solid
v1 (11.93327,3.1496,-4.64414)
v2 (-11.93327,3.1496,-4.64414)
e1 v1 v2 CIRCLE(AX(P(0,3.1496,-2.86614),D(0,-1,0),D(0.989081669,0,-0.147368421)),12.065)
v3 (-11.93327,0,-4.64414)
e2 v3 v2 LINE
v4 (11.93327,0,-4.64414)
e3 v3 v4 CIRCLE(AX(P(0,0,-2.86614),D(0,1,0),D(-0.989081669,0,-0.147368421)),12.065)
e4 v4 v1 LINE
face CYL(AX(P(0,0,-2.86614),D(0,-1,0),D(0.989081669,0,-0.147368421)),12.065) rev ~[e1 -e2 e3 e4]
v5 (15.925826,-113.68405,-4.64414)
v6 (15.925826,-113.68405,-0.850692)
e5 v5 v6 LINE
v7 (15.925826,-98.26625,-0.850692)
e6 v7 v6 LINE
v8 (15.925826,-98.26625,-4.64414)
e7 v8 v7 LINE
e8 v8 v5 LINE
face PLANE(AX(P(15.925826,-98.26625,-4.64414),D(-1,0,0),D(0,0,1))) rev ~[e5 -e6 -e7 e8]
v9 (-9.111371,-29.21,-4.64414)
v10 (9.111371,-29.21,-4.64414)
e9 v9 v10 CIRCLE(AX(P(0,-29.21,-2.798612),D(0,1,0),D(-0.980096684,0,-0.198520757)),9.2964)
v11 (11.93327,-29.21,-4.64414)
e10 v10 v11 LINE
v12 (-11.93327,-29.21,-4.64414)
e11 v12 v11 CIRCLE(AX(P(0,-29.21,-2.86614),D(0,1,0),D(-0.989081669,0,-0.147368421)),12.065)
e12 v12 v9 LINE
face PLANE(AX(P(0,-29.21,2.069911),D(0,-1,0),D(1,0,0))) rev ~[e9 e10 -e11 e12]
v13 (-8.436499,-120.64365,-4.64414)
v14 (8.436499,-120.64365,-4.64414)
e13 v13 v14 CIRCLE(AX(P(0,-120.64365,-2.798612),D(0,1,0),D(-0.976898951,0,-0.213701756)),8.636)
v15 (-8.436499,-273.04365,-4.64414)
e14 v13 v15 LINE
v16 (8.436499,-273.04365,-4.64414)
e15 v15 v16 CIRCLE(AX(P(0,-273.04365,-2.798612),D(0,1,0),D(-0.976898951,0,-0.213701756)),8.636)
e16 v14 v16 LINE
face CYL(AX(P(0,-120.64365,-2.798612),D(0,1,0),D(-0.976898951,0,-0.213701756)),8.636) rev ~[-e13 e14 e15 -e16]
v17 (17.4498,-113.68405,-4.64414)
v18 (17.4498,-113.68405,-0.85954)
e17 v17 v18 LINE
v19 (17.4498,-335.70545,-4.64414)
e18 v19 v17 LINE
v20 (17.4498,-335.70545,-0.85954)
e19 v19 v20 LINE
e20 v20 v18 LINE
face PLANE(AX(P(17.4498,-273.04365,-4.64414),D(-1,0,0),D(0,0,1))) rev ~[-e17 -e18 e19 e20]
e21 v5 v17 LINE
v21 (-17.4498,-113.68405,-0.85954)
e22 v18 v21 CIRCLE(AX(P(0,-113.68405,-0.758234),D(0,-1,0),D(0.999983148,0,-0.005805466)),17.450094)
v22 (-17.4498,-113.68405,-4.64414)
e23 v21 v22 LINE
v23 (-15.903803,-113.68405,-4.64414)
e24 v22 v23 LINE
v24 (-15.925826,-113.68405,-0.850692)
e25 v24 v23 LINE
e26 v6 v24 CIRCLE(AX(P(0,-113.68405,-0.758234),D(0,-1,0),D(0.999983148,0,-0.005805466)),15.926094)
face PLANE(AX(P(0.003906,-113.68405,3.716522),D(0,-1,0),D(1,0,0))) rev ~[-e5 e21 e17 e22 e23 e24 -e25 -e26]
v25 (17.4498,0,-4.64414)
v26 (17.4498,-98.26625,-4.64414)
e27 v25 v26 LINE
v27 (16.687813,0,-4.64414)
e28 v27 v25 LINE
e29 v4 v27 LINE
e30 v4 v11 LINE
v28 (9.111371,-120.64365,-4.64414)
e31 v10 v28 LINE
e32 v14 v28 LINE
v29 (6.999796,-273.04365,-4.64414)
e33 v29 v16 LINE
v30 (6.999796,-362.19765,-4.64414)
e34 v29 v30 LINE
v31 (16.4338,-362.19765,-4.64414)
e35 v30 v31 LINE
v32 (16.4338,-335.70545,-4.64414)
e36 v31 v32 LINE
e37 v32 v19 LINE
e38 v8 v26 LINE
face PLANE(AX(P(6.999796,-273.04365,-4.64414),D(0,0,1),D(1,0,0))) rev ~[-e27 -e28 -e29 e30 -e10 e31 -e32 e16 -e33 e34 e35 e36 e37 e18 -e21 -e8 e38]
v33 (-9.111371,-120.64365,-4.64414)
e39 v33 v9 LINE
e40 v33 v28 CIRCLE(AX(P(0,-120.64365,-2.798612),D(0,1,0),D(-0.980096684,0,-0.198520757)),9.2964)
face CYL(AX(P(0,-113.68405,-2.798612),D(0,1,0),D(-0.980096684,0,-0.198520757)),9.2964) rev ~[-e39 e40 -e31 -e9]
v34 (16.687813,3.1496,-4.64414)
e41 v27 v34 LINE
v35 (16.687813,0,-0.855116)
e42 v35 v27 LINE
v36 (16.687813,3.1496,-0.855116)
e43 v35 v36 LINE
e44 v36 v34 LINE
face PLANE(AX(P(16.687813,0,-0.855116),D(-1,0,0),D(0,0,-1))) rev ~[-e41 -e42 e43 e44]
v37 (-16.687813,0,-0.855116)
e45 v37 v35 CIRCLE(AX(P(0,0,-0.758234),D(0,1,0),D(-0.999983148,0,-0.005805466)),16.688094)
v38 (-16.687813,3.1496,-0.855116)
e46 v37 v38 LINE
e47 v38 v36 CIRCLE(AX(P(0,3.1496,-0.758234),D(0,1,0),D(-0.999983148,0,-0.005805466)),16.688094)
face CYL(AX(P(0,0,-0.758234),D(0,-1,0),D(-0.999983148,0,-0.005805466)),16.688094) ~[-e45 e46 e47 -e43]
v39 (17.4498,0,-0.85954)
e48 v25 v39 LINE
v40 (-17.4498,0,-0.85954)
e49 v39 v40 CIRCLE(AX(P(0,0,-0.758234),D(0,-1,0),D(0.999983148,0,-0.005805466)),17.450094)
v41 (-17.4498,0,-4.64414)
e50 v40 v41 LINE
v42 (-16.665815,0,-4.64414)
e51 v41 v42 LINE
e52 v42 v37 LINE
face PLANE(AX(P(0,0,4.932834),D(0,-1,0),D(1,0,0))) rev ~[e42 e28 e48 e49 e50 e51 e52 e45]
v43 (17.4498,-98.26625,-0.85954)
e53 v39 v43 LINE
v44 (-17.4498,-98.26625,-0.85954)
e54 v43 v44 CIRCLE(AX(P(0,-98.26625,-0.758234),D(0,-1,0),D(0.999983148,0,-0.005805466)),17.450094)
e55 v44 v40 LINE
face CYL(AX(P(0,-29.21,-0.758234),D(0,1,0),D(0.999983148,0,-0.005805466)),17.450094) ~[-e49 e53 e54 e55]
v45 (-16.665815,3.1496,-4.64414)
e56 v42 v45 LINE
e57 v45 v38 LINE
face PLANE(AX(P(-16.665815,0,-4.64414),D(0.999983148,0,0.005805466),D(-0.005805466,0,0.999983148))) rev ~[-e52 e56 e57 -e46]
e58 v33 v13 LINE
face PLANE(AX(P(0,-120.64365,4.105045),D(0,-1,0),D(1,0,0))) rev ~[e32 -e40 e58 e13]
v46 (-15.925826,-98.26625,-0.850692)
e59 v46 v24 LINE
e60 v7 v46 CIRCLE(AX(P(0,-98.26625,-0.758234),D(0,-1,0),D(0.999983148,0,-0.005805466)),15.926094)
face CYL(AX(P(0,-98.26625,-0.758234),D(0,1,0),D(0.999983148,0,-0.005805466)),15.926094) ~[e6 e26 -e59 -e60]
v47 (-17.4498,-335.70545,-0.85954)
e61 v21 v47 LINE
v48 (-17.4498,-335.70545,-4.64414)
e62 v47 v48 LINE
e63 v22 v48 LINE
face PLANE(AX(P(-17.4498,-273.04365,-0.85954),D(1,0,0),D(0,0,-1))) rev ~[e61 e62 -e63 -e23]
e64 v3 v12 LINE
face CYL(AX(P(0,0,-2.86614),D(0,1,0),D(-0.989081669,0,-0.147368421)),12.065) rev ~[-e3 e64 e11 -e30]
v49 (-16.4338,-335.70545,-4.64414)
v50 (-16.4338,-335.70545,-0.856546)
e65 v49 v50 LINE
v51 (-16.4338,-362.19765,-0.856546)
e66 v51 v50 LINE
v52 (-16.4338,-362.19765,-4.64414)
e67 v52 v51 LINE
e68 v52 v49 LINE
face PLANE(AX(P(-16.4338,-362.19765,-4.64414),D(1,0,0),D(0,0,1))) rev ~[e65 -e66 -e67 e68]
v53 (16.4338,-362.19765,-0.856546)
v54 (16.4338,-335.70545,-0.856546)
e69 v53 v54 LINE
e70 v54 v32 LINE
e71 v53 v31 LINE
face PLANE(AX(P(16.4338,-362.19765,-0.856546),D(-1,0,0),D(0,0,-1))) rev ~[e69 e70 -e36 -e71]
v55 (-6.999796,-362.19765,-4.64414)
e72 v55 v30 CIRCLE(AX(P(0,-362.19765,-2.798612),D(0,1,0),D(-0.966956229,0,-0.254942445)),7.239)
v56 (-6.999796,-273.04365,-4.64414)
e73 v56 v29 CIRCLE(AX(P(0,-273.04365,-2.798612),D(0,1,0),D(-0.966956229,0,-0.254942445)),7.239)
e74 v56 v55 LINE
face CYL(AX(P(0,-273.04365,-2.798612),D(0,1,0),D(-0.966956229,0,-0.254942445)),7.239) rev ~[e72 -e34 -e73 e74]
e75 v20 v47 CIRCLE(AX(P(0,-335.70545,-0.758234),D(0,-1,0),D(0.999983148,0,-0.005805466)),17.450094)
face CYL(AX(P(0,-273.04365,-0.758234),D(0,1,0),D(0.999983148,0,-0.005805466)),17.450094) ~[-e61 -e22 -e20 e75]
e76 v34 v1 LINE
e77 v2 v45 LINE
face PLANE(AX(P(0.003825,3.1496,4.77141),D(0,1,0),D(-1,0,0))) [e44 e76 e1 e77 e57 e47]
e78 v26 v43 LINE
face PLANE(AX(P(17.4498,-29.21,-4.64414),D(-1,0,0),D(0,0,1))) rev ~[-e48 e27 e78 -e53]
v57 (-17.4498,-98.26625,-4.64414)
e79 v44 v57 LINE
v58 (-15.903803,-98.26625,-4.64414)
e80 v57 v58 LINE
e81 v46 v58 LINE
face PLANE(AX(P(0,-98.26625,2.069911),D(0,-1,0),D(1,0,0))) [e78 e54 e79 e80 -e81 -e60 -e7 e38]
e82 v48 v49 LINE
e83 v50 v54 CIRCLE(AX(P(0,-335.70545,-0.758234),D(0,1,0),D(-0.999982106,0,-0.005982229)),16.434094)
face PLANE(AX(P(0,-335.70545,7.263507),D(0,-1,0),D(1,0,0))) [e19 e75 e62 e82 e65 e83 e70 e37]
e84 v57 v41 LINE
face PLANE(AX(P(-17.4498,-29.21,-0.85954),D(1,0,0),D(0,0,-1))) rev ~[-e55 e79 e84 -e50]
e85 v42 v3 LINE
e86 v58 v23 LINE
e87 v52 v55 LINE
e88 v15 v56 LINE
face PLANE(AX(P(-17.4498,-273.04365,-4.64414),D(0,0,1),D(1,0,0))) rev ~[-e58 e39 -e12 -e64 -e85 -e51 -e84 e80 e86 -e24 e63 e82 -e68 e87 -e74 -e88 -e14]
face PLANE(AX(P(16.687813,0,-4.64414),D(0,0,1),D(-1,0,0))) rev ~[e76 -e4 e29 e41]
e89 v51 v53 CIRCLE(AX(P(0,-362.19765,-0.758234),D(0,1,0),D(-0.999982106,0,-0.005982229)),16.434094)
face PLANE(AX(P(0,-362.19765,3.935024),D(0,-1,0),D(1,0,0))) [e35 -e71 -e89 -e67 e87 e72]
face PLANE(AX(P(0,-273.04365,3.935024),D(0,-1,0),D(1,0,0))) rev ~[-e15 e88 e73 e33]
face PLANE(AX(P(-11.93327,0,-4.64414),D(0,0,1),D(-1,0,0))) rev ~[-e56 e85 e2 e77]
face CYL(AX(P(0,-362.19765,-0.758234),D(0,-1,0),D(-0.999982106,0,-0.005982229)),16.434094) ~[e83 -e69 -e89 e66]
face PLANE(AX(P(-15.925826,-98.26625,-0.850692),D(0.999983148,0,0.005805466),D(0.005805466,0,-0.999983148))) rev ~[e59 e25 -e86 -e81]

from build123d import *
from build123d import SkipClean  # not in build123d's __all__

# Parameters (mm, degrees)
F1_DEPTH  = 29.21
F3_DEPTH  = 69.05625
F5_DEPTH  = 15.4178
F7_DEPTH  = 6.9596
F9_DEPTH  = 152.4
F11_DEPTH = 89.154
F13_DEPTH = 26.4922
F15_DEPTH = 3.1496


with BuildPart() as f1:
    # F0 (on Front) → F1 (new body)
    with BuildSketch(Plane.XZ):
        with BuildLine():
            Line((11.9332703397, -4.6441399077), (17.4498, -4.6441399077))
            Line((17.4498, -4.6441399077), (17.4498, -0.8595399077))
            ThreePointArc((17.4498, -0.8595399077), (0, 16.6918600923), (-17.4498, -0.8595399077))
            Line((-17.4498, -0.8595399077), (-17.4498, -4.6441399077))
            Line((-17.4498, -4.6441399077), (-11.9332703397, -4.6441399077))
            ThreePointArc((-11.9332703397, -4.6441399077), (0, 9.1988600923), (11.9332703397, -4.6441399077))
        make_face()
    extrude(amount=F1_DEPTH)

    # F2 (on face) → F3 (join)
    with BuildSketch(Plane.XZ.offset(29.21)):
        with BuildLine():
            ThreePointArc((-9.1113708093, -4.6441399077), (0, 6.4977884545), (9.1113708093, -4.6441399077))
            Line((9.1113708093, -4.6441399077), (11.9332703397, -4.6441399077))
            ThreePointArc((11.9332703397, -4.6441399077), (0, 9.1988600923), (-11.9332703397, -4.6441399077))
            Line((-11.9332703397, -4.6441399077), (-9.1113708093, -4.6441399077))
        make_face()
        with BuildLine():
            ThreePointArc((-11.9332703397, -4.6441399077), (0, 9.1988600923), (11.9332703397, -4.6441399077))
            Line((11.9332703397, -4.6441399077), (17.4498, -4.6441399077))
            Line((17.4498, -4.6441399077), (17.4498, -0.8595399077))
            ThreePointArc((17.4498, -0.8595399077), (0, 16.6918600923), (-17.4498, -0.8595399077))
            Line((-17.4498, -0.8595399077), (-17.4498, -4.6441399077))
            Line((-17.4498, -4.6441399077), (-11.9332703397, -4.6441399077))
        make_face()
    extrude(amount=F3_DEPTH)

    # F4 (on face) → F5 (join)
    with BuildSketch(Plane.XZ.offset(98.26625)):
        with BuildLine():
            Line((15.9258256822, -4.6441399077), (15.9258256822, -0.850692377))
            ThreePointArc((15.9258256822, -0.850692377), (0, 15.1678600923), (-15.9258256822, -0.850692377))
            Line((-15.9258256822, -0.850692377), (-15.9038025792, -4.6441399077))
            Line((-15.9038025792, -4.6441399077), (-9.1113708093, -4.6441399077))
            ThreePointArc((-9.1113708093, -4.6441399077), (0, 6.4977884545), (9.1113708093, -4.6441399077))
            Line((9.1113708093, -4.6441399077), (15.9258256822, -4.6441399077))
        make_face()
    extrude(amount=F5_DEPTH)

    # F6 (on face) → F7 (join)
    with BuildSketch(Plane.XZ.offset(113.68405)):
        with BuildLine():
            ThreePointArc((-9.1113708093, -4.6441399077), (0, 6.4977884545), (9.1113708093, -4.6441399077))
            Line((9.1113708093, -4.6441399077), (15.9258256822, -4.6441399077))
            Line((15.9258256822, -4.6441399077), (15.9258256822, -0.850692377))
            ThreePointArc((15.9258256822, -0.850692377), (0, 15.1678600923), (-15.9258256822, -0.850692377))
            Line((-15.9258256822, -0.850692377), (-15.9038025792, -4.6441399077))
            Line((-15.9038025792, -4.6441399077), (-9.1113708093, -4.6441399077))
        make_face()
        with BuildLine():
            Line((15.9258256822, -0.850692377), (15.9258256822, -4.6441399077))
            Line((15.9258256822, -4.6441399077), (17.4498, -4.6441399077))
            Line((17.4498, -4.6441399077), (17.4498, -0.8595399077))
            ThreePointArc((17.4498, -0.8595399077), (0, 16.6918600923), (-17.4498, -0.8595399077))
            Line((-17.4498, -0.8595399077), (-17.4498, -4.6441399077))
            Line((-17.4498, -4.6441399077), (-15.9038025792, -4.6441399077))
            Line((-15.9038025792, -4.6441399077), (-15.9258256822, -0.850692377))
            ThreePointArc((-15.9258256822, -0.850692377), (0, 15.1678600923), (15.9258256822, -0.850692377))
        make_face()
    extrude(amount=F7_DEPTH)

    # F8 (on face) → F9 (join)
    with BuildSketch(Plane.XZ.offset(120.64365)):
        with BuildLine():
            ThreePointArc((17.4498, -0.8595399077), (0, 16.6918600923), (-17.4498, -0.8595399077))
            Line((-17.4498, -0.8595399077), (-17.4498, -4.6441399077))
            Line((-17.4498, -4.6441399077), (-9.1113708093, -4.6441399077))
            ThreePointArc((-9.1113708093, -4.6441399077), (0, 6.4977884545), (9.1113708093, -4.6441399077))
            Line((9.1113708093, -4.6441399077), (17.4498, -4.6441399077))
            Line((17.4498, -4.6441399077), (17.4498, -0.8595399077))
        make_face()
        with BuildLine():
            ThreePointArc((9.1113708093, -4.6441399077), (0, 6.4977884545), (-9.1113708093, -4.6441399077))
            Line((-9.1113708093, -4.6441399077), (-8.4364993371, -4.6441399077))
            ThreePointArc((-8.4364993371, -4.6441399077), (0, 5.8373884545), (8.4364993371, -4.6441399077))
            Line((8.4364993371, -4.6441399077), (9.1113708093, -4.6441399077))
        make_face()
    extrude(amount=F9_DEPTH)

    # F10 (on face) → F11 (join)
    with BuildSketch(Plane.XZ.offset(273.04365)):
        with BuildLine():
            ThreePointArc((17.4498, -0.8595399077), (0, 16.6918600923), (-17.4498, -0.8595399077))
            Line((-17.4498, -0.8595399077), (-17.4498, -4.6441399077))
            Line((-17.4498, -4.6441399077), (-8.4364993371, -4.6441399077))
            ThreePointArc((-8.4364993371, -4.6441399077), (0, 5.8373884545), (8.4364993371, -4.6441399077))
            Line((8.4364993371, -4.6441399077), (17.4498, -4.6441399077))
            Line((17.4498, -4.6441399077), (17.4498, -0.8595399077))
        make_face()
        with BuildLine():
            ThreePointArc((8.4364993371, -4.6441399077), (0, 5.8373884545), (-8.4364993371, -4.6441399077))
            Line((-8.4364993371, -4.6441399077), (-6.9997961445, -4.6441399077))
            ThreePointArc((-6.9997961445, -4.6441399077), (0, 4.4403884545), (6.9997961445, -4.6441399077))
            Line((6.9997961445, -4.6441399077), (8.4364993371, -4.6441399077))
        make_face()
    extrude(amount=F11_DEPTH)

    # F12 (on face) → F13 (cut)
    with BuildSketch(Plane.XZ.offset(362.19765)):
        with BuildLine():
            ThreePointArc((-16.4338, -0.8565464804), (0, 15.6758600923), (16.4338, -0.8565464805))
            Line((16.4338, -0.8565464805), (16.4338, -4.6441399077))
            Line((16.4338, -4.6441399077), (17.4498, -4.6441399077))
            Line((17.4498, -4.6441399077), (17.4498, -0.8595399077))
            ThreePointArc((17.4498, -0.8595399077), (0, 16.6918600923), (-17.4498, -0.8595399077))
            Line((-17.4498, -0.8595399077), (-17.4498, -4.6441399077))
            Line((-17.4498, -4.6441399077), (-16.4338, -4.6441399077))
            Line((-16.4338, -4.6441399077), (-16.4338, -0.8565464804))
        make_face()
    extrude(amount=-F13_DEPTH, mode=Mode.SUBTRACT)

    # F14 (on face) → F15 (join)
    with BuildSketch(Plane(origin=(0, 0, 0), x_dir=(-1, 0, 0), z_dir=(0, 1, 0))):
        with BuildLine():
            ThreePointArc((16.6878128411, -0.8551161423), (0, 15.9298600923), (-16.6878128411, -0.8551161423))
            Line((-16.6878128411, -0.8551161423), (-16.6878128411, -4.6441399077))
            Line((-16.6878128411, -4.6441399077), (-11.9332703397, -4.6441399077))
            ThreePointArc((-11.9332703397, -4.6441399077), (0, 9.1988600923), (11.9332703397, -4.6441399077))
            Line((11.9332703397, -4.6441399077), (16.6658154206, -4.6441399077))
            Line((16.6658154206, -4.6441399077), (16.6878128411, -0.8551161423))
        make_face()
    with SkipClean():  # cleaning this boolean's faces spoils the solid; the shape is the same uncleaned
        extrude(amount=F15_DEPTH)


solid = f1.part
